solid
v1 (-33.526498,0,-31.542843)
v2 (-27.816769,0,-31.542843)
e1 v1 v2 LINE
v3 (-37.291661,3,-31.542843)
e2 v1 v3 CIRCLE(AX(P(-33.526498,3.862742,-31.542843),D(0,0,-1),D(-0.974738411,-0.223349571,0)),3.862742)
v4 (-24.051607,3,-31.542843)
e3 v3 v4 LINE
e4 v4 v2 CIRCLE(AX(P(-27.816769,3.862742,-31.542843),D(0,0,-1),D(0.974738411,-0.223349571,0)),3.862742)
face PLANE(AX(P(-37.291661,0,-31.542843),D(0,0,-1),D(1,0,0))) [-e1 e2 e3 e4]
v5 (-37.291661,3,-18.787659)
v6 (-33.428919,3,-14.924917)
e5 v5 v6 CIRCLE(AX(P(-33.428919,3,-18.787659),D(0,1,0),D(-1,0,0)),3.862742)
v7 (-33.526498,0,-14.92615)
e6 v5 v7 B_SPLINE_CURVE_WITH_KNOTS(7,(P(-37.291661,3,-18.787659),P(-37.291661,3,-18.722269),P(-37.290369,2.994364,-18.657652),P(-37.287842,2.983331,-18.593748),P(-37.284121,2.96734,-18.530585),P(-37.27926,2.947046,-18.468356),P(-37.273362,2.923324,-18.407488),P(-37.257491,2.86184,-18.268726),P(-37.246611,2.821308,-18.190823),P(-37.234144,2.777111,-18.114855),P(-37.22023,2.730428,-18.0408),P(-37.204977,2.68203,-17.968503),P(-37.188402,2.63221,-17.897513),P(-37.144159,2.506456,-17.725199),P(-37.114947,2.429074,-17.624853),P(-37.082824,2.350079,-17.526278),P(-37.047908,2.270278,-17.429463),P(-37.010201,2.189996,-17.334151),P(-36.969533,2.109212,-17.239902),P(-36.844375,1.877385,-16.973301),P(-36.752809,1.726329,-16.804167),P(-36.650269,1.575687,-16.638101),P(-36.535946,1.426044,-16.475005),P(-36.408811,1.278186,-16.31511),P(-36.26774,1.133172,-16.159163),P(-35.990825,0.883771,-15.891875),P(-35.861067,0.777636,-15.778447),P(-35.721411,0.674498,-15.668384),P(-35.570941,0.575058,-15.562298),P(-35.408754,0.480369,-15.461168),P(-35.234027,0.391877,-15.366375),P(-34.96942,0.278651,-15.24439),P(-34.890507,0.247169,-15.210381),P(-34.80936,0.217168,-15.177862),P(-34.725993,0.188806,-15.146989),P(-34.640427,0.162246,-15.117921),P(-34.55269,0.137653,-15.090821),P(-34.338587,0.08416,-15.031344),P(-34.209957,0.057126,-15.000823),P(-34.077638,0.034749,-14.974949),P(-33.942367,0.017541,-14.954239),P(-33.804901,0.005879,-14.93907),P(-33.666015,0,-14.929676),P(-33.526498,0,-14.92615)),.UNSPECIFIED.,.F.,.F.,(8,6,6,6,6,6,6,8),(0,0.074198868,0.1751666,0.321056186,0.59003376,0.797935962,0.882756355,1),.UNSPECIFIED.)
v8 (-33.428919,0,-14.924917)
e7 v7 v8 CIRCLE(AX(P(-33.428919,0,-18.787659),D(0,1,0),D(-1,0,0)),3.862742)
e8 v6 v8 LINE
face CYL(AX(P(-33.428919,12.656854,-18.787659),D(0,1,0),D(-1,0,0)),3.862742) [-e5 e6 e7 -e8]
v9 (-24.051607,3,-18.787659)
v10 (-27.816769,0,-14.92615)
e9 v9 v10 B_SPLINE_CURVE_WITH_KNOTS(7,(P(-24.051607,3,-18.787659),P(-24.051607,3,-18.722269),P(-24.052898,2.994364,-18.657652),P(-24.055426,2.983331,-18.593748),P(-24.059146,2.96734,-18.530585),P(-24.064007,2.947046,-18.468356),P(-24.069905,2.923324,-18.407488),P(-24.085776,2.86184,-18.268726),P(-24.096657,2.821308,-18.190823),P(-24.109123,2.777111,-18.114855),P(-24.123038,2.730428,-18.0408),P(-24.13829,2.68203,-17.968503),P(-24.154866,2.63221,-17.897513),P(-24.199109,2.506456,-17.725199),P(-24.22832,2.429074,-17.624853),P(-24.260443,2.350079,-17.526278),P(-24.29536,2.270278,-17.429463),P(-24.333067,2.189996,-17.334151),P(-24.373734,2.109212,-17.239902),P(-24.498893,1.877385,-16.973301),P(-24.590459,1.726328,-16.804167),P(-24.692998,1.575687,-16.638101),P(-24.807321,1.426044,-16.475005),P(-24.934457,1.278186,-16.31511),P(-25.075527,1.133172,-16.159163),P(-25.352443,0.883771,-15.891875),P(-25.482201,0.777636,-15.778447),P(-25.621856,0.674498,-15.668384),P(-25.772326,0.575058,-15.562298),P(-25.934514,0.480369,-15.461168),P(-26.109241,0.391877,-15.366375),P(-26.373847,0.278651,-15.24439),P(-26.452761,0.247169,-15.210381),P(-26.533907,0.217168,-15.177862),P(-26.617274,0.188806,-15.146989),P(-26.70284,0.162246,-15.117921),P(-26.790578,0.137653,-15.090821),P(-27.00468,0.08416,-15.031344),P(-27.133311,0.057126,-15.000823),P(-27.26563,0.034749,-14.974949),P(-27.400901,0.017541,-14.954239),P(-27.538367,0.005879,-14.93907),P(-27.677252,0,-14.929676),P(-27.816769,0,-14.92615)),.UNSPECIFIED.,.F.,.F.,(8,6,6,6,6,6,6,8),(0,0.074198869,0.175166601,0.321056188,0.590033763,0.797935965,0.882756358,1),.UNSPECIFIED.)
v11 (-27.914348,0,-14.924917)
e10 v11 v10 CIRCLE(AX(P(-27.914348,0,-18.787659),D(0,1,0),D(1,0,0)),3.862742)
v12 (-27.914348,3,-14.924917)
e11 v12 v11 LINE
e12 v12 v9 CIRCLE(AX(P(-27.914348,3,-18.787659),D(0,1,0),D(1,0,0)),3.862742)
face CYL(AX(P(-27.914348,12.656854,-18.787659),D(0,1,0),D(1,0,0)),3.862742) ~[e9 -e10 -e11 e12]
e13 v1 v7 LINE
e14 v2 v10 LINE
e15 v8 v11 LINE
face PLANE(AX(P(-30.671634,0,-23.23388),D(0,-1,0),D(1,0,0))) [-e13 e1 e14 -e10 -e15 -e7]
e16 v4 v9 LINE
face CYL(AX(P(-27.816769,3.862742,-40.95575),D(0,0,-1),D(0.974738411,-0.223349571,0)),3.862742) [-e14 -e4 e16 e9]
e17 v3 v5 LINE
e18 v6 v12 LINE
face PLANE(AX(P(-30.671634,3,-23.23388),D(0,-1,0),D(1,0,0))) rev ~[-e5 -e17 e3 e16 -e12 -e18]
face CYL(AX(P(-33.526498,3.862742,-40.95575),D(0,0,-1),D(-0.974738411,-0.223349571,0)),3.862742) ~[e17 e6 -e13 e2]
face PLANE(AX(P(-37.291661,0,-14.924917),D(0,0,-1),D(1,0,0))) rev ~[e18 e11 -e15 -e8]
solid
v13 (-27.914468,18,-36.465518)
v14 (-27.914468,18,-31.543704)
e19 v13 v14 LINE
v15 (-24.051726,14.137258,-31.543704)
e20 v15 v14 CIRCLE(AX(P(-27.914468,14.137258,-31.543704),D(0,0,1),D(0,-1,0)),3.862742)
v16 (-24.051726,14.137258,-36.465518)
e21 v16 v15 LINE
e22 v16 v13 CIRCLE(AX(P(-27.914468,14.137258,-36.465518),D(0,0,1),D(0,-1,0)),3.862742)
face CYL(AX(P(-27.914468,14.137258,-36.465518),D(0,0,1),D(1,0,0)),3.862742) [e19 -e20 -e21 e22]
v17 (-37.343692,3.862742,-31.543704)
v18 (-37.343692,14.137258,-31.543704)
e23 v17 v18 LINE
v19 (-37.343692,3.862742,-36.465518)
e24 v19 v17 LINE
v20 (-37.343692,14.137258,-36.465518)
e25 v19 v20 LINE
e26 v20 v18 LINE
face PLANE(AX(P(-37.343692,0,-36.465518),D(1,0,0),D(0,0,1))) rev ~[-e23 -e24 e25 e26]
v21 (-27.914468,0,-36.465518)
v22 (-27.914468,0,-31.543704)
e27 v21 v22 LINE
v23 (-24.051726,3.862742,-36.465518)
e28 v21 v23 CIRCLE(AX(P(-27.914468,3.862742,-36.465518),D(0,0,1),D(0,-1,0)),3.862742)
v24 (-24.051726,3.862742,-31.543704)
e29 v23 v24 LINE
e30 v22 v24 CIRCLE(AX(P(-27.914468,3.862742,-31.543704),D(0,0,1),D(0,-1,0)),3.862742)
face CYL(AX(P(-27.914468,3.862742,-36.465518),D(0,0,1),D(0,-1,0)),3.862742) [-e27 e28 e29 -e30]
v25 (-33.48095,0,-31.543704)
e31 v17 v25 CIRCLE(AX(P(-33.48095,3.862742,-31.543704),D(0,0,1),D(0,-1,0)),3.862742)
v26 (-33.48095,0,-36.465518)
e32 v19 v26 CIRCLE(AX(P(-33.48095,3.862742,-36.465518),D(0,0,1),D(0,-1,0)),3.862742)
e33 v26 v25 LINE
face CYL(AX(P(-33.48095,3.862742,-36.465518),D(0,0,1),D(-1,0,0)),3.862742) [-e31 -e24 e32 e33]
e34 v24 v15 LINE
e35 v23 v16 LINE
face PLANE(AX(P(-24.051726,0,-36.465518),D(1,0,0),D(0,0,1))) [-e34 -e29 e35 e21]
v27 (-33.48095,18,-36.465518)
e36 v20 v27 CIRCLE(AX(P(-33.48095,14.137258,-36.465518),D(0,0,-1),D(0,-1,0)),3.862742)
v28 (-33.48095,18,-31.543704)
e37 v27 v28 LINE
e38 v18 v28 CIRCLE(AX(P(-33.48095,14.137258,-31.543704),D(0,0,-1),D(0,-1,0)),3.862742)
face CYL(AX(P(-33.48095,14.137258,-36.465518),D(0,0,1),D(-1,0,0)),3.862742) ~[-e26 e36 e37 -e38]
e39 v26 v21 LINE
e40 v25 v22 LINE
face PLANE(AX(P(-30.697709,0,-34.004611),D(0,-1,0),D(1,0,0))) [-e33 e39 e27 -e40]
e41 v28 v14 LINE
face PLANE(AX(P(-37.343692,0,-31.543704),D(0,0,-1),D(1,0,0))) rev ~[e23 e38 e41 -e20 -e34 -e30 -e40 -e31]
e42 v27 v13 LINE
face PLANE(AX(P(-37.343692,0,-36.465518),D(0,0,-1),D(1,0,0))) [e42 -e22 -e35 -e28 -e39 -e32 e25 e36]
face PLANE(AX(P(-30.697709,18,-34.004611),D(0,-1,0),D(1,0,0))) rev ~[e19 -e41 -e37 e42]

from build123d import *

# Parameters (mm, degrees)
F0_W          = 13.2919661701
F0_H          = 4.9218144268
F1_DEPTH      = 18
F2_W          = 13.2400542498
F2_H          = 16.6179258376
F3_DEPTH      = 3
F4_F1_R       = 3.8627416998
F4_F2_R       = 3.8627416998
F4_F3_R       = 3.8627416998
F4_F4_R       = 3.8627416998
F4_2_T1_DEPTH = 22.313708499
F4_2_T3_DEPTH = 35.4437393651


# Not quite as in the source:
# - a fillet or chamfer that OpenCascade refuses, or shapes differently, is made with other operations: its cross-section is extruded or revolved along the edge and cut away or added


with BuildPart() as f1:
    # F0 (on Front) → F1 (new body)
    with BuildSketch(Plane.XZ):
        with Locations((-30.6977089494, -34.0046109632)):
            Rectangle(F0_W, F0_H)
    extrude(amount=-F1_DEPTH)

    # F4: fillet of radius 3.8627416998 on 4 edges, made by hand

    # F4_f1
    f4_f1_edges = [f1.edges().sort_by_distance(p)[0] for p in [
        (-37.3436920345, 0, -34.0046109632),
    ]]
    fillet(f4_f1_edges, radius=F4_F1_R)

    # F4_f2
    f4_f2_edges = [f1.edges().sort_by_distance(p)[0] for p in [
        (-37.3436920345, 18, -34.0046109632),
    ]]
    fillet(f4_f2_edges, radius=F4_F2_R)

    # F4_f3
    f4_f3_edges = [f1.edges().sort_by_distance(p)[0] for p in [
        (-24.0517258644, 0, -34.0046109632),
    ]]
    fillet(f4_f3_edges, radius=F4_F3_R)

    # F4_f4
    f4_f4_edges = [f1.edges().sort_by_distance(p)[0] for p in [
        (-24.0517258644, 18, -34.0046109632),
    ]]
    fillet(f4_f4_edges, radius=F4_F4_R)


with BuildPart() as f3:
    # F2 (on Front) → F3 (new body)
    with BuildSketch(Plane.XZ):
        with Locations((-30.67163378, -23.2338802889)):
            Rectangle(F2_W, F2_H)
    extrude(amount=-F3_DEPTH)

    # F4#2: fillet of radius 3.8627416998 on 4 edges, made by hand

    # F4_2_s2 → F4_2_t1 (cut)
    with BuildSketch(Plane.XZ.offset(-12.6568542495)):
        with BuildLine():
            ThreePointArc((-24.0516066551, -18.7876590699), (-25.182977505, -16.05628822), (-27.9143483549, -14.9249173701))
            Line((-27.9143483549, -14.9249173701), (-24.0516066551, -14.9249173701))
            Line((-24.0516066551, -14.9249173701), (-24.0516066551, -18.7876590699))
        make_face()
        with BuildLine():
            ThreePointArc((-37.2916609049, -18.7876590699), (-36.160290055, -16.05628822), (-33.4289192051, -14.9249173701))
            Line((-33.4289192051, -14.9249173701), (-37.2916609049, -14.9249173701))
            Line((-37.2916609049, -14.9249173701), (-37.2916609049, -18.7876590699))
        make_face()
    extrude(amount=F4_2_T1_DEPTH, mode=Mode.SUBTRACT)

    # F4_2_s4 → F4_2_t3 (cut)
    with BuildSketch(Plane.XY.offset(-40.9557499714)):
        with BuildLine():
            ThreePointArc((-24.0516066551, 3), (-25.4096730705, 0.8417053065), (-27.8167693606, 0))
            Line((-27.8167693606, 0), (-24.0516066551, 0))
            Line((-24.0516066551, 0), (-24.0516066551, 3))
        make_face()
        with BuildLine():
            ThreePointArc((-37.2916609049, 3), (-35.9335944895, 0.8417053065), (-33.5264981994, 0))
            Line((-33.5264981994, 0), (-37.2916609049, 0))
            Line((-37.2916609049, 0), (-37.2916609049, 3))
        make_face()
    extrude(amount=F4_2_T3_DEPTH, mode=Mode.SUBTRACT)


solid = Compound([f1.part, f3.part])
